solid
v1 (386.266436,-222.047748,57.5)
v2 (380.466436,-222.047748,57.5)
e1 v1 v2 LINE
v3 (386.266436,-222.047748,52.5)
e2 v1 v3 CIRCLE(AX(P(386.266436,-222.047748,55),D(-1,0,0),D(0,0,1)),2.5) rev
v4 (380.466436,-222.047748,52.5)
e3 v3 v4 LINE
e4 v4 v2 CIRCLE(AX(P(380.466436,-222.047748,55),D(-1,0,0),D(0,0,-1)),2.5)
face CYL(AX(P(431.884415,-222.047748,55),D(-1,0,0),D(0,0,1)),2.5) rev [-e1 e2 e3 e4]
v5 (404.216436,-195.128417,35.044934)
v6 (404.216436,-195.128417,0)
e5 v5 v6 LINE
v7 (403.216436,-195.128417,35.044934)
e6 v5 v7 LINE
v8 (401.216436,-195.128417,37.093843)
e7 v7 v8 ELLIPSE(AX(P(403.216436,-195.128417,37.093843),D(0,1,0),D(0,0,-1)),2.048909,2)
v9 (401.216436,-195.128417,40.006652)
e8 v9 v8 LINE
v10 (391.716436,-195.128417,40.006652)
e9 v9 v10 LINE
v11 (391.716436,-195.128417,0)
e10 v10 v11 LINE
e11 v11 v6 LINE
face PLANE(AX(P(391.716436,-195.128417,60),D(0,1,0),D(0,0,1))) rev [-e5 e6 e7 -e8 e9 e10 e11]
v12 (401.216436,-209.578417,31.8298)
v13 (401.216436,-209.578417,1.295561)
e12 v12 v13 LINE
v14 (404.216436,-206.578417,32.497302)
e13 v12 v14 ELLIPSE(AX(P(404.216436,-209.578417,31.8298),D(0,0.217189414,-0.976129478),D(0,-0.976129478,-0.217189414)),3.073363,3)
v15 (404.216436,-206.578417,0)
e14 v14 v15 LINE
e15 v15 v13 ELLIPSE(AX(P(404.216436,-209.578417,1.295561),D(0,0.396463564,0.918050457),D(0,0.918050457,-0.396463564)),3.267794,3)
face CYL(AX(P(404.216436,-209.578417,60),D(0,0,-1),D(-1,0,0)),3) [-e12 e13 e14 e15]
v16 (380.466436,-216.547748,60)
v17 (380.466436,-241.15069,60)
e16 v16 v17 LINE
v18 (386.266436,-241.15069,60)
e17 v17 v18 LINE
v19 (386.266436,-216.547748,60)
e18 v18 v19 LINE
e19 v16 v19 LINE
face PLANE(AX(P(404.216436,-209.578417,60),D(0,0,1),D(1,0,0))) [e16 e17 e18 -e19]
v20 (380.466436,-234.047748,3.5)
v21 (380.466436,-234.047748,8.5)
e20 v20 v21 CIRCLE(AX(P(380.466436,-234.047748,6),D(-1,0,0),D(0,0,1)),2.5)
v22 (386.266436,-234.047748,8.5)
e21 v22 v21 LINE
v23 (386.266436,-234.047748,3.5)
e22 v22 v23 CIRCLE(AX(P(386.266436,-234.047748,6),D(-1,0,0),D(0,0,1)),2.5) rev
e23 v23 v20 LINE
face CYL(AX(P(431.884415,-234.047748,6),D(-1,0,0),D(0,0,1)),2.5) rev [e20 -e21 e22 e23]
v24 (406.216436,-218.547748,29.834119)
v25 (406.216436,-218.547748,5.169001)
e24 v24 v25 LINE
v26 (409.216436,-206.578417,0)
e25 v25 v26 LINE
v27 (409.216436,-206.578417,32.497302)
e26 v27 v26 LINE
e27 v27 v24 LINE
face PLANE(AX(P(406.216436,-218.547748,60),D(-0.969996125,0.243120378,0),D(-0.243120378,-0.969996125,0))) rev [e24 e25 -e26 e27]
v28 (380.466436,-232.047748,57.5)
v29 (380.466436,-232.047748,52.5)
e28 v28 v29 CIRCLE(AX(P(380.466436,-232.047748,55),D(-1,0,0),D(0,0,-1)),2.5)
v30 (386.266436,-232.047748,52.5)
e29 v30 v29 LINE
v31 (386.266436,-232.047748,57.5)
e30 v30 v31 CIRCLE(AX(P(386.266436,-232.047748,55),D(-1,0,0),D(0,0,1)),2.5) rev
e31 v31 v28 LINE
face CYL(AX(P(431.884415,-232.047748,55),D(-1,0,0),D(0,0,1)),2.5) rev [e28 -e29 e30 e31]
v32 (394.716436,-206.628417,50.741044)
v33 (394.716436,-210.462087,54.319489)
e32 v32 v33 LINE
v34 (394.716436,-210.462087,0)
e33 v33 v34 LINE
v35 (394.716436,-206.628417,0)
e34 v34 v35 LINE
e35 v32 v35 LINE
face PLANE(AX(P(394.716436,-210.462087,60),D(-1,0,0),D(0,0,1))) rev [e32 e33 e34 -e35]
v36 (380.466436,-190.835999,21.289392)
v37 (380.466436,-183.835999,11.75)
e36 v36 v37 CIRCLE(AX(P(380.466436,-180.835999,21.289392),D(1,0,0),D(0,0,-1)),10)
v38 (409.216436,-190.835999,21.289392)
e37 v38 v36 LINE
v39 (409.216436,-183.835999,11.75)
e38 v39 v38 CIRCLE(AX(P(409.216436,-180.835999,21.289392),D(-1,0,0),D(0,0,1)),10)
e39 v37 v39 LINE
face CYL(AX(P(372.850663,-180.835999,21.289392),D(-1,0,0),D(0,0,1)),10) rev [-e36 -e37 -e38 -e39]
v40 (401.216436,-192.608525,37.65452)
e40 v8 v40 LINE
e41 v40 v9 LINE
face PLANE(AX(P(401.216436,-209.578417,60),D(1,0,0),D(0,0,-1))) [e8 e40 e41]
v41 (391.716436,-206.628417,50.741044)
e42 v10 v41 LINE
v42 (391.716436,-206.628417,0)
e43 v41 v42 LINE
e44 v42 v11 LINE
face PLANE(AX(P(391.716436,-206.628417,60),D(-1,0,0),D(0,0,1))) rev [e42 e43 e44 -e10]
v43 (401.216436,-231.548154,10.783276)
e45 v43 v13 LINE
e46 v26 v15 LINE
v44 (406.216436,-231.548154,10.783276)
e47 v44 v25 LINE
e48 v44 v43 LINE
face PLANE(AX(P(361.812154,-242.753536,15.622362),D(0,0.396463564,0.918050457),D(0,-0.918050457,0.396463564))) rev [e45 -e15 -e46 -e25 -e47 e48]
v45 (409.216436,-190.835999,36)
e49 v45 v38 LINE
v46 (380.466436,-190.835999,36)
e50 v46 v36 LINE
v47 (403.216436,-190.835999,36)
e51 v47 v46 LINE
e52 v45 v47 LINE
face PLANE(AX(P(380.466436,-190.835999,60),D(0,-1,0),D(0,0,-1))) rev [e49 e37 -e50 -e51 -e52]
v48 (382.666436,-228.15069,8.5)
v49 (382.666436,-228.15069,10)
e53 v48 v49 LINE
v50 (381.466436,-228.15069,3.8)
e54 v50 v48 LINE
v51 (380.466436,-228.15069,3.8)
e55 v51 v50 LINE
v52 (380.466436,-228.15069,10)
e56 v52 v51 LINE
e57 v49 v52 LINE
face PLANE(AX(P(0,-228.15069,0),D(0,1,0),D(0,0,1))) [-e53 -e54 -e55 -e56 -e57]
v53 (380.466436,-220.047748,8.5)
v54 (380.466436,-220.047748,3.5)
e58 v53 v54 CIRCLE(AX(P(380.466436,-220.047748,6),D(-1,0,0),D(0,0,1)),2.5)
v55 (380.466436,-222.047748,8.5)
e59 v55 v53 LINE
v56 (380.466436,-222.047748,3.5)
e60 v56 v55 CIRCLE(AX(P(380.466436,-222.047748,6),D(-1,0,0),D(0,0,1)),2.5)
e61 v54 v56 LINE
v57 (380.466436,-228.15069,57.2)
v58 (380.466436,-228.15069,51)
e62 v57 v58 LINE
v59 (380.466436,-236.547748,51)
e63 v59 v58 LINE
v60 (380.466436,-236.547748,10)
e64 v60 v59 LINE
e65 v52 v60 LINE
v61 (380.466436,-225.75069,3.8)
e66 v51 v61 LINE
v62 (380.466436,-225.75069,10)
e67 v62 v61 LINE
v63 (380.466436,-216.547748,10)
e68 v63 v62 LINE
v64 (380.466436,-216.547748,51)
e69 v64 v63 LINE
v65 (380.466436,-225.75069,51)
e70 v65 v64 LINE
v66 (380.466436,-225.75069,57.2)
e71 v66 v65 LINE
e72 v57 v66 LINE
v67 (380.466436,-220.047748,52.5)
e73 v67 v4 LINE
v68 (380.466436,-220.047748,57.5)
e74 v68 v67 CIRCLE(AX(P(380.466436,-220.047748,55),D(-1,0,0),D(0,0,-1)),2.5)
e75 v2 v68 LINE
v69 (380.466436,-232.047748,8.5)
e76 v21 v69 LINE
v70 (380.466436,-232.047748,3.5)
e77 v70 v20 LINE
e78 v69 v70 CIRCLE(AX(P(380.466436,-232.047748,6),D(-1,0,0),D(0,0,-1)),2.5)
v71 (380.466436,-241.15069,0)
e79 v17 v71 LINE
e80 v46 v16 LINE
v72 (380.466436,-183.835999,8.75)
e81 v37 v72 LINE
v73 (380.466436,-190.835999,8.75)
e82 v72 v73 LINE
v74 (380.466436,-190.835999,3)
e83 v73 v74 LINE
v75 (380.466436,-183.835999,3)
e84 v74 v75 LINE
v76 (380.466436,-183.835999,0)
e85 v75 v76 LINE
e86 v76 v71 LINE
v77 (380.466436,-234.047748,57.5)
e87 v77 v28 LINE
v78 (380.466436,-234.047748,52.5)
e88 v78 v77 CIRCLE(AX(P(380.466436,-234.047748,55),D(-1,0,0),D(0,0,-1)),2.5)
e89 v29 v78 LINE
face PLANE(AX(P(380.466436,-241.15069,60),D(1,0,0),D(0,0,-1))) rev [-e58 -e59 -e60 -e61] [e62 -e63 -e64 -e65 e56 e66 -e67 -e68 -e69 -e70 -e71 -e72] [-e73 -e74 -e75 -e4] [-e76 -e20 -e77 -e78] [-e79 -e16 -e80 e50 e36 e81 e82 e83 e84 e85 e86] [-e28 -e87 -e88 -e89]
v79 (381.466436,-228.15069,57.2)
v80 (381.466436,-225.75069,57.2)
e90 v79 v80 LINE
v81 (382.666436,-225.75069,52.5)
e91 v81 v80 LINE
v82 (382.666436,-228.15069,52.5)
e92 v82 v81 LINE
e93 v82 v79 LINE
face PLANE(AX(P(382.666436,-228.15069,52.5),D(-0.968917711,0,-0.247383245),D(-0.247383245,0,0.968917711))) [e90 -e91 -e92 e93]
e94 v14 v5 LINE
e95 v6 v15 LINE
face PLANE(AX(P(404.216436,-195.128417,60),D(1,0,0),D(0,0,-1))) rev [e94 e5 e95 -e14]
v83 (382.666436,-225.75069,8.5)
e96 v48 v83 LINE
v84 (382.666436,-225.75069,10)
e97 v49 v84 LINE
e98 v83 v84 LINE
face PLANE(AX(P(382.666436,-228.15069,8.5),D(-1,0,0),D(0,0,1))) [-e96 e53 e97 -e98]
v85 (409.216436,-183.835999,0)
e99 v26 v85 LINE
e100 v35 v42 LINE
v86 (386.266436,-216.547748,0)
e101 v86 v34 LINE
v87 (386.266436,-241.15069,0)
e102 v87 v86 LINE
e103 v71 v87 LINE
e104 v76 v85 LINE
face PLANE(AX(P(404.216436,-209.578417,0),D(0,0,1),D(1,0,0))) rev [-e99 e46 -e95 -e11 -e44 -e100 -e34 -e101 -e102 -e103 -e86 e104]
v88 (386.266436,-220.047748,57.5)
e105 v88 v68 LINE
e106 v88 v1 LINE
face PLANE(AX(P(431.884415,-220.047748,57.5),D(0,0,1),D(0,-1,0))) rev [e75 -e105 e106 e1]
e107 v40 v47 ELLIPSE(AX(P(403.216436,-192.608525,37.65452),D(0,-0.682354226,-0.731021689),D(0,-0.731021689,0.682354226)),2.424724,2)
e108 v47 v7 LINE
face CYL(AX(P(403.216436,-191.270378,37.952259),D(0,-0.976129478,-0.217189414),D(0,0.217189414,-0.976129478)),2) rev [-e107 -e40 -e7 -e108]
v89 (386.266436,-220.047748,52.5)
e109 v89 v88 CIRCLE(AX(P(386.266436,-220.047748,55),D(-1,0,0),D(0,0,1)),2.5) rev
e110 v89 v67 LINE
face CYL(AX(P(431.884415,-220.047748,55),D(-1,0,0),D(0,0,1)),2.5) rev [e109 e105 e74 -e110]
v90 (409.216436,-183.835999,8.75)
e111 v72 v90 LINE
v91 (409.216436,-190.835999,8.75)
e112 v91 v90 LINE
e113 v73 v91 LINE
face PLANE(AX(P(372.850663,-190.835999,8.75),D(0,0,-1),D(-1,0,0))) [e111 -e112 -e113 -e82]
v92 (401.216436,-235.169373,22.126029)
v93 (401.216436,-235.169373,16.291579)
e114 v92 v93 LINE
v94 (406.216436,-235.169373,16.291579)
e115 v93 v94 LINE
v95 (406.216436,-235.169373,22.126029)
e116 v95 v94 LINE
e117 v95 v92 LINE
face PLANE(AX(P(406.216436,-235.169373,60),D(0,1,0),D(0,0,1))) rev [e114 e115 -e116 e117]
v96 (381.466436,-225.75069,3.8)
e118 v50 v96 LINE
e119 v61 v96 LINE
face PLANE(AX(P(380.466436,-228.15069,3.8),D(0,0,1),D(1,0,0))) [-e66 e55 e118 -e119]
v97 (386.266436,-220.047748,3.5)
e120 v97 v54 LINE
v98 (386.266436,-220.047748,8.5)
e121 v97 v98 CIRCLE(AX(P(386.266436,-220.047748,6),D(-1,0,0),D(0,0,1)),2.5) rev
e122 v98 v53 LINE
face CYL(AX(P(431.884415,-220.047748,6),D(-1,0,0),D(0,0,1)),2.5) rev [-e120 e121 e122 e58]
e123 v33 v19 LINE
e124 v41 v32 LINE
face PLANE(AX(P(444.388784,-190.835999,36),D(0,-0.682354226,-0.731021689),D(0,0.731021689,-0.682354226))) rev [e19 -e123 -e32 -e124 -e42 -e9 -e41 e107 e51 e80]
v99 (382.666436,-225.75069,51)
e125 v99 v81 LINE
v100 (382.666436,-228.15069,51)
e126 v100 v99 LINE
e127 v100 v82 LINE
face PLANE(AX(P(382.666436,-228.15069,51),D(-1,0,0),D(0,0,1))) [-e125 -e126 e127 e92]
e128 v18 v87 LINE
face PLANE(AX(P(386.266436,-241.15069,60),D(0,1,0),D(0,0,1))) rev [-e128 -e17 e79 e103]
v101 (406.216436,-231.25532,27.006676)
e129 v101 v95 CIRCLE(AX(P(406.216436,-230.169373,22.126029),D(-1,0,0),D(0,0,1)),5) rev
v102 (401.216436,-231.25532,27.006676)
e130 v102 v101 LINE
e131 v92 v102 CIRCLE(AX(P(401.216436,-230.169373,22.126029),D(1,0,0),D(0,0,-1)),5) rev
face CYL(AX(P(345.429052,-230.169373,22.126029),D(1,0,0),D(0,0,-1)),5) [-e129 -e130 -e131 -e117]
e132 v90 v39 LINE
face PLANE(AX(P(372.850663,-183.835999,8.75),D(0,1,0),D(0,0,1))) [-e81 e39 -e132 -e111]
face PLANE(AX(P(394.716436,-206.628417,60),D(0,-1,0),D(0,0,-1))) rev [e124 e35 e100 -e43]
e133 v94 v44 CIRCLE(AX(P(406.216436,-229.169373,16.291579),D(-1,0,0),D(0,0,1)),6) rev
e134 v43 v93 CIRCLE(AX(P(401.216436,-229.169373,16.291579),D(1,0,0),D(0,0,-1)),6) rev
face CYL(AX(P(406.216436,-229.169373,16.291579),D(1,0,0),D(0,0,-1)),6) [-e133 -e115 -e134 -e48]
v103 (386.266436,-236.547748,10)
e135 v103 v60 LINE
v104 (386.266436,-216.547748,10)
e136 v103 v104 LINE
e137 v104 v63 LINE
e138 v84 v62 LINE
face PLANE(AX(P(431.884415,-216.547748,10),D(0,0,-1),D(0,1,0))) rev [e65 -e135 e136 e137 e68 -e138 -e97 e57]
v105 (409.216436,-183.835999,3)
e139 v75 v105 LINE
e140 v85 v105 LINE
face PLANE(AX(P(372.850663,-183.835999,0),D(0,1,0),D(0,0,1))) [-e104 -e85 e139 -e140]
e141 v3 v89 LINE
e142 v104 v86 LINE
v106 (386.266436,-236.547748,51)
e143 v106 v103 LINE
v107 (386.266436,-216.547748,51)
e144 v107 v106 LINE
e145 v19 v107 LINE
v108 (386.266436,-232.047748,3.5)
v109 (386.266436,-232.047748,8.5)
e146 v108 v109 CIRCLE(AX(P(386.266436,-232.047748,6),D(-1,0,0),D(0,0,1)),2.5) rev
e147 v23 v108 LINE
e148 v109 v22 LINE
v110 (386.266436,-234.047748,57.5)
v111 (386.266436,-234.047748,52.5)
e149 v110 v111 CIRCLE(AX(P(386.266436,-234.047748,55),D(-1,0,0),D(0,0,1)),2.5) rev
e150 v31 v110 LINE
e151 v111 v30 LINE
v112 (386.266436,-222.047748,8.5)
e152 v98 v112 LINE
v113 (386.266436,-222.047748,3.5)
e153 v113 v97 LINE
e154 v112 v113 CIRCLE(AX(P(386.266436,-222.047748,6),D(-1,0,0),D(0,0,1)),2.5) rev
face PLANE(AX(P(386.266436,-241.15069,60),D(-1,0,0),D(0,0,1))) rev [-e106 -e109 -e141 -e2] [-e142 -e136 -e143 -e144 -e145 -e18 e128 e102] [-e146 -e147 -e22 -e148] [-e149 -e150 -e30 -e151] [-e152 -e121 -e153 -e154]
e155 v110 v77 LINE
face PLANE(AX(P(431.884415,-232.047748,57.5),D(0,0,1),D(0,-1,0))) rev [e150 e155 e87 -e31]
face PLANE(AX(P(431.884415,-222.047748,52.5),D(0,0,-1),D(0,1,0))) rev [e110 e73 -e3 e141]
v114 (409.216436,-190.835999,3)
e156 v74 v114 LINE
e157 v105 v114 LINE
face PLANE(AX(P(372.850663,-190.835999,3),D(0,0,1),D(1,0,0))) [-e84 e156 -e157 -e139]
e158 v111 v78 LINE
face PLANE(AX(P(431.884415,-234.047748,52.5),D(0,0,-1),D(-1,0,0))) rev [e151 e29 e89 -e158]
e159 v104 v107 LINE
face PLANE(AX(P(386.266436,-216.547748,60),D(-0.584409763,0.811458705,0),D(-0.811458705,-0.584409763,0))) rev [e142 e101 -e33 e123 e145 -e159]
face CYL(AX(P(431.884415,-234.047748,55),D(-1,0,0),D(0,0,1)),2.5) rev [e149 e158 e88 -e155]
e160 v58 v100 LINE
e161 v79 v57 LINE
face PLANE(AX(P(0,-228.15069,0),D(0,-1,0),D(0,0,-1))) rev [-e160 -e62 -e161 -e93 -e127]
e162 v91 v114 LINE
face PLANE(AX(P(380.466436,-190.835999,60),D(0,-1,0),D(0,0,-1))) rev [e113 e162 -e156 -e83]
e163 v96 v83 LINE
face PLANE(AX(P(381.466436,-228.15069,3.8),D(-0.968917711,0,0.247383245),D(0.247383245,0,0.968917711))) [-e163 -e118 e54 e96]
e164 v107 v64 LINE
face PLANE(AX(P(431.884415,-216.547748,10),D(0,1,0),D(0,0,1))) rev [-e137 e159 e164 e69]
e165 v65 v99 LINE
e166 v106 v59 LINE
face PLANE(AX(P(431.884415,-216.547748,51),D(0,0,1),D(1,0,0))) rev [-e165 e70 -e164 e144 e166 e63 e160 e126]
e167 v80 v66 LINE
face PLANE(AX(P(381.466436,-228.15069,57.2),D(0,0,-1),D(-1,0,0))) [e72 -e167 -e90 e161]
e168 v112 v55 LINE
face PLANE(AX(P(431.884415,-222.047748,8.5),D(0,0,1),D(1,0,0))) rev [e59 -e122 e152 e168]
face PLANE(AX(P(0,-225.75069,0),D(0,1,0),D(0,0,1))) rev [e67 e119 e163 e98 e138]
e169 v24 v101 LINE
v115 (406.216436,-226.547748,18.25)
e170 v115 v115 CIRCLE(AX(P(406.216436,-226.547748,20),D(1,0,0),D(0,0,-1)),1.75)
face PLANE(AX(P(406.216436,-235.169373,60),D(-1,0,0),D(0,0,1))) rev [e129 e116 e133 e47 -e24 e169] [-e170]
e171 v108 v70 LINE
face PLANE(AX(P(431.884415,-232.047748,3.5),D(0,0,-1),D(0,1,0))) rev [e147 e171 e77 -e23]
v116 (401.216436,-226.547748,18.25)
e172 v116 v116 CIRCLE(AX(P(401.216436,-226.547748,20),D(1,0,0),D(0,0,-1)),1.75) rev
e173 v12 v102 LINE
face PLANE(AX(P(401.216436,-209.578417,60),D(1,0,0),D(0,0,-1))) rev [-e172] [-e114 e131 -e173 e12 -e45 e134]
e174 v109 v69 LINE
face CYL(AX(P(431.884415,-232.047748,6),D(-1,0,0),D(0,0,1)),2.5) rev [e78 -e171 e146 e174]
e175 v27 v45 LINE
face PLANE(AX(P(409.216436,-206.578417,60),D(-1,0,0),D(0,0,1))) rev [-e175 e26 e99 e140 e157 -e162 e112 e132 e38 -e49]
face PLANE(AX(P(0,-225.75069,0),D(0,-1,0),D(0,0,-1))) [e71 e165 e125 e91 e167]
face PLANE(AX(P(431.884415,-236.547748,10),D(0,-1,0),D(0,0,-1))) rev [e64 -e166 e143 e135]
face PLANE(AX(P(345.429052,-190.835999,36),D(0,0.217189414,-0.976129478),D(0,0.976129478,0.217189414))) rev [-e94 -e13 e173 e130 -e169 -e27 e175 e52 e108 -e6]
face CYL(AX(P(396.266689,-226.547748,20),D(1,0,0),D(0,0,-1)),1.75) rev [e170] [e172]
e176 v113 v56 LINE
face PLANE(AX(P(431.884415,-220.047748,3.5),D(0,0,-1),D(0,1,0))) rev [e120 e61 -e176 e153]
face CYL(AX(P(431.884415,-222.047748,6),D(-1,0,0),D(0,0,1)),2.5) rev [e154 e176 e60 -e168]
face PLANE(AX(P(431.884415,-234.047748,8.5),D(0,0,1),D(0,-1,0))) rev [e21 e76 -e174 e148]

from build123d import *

# Parameters (mm, degrees)
BOSS_EXTRUDE1_DEPTH     = 60
CUT_EXTRUDE1_REACH      = 252.16
SKETCH4_W               = 41
SKETCH4_H               = 20
CUT_EXTRUDE2_DEPTH      = 1
CUT_EXTRUDE2_DEPTH_BACK = 1.4
CUT_EXTRUDE2_START      = -14
SKETCH2_R               = 1.75
CUT_EXTRUDE3_DEPTH      = 5
SKETCH6_W               = 3
SKETCH6_H               = 7
BOSS_EXTRUDE2_DEPTH     = 28.75
FILLET1_R               = 10
CUT_EXTRUDE4_REACH      = 252.16
CUT_EXTRUDE5_REACH      = 252.16
CUT_EXTRUDE6_REACH      = 252.16
FILLET2_R               = 5
FILLET3_R               = 6
FILLET4_R               = 2


with BuildPart() as part:
    # Sketch1 → Boss-Extrude1 (new body)
    with BuildSketch(Plane.XY):
        with BuildLine():
            Line((391.716436469, -195.128416651), (404.216436469, -195.128416651))
            Line((404.216436469, -195.128416651), (404.216436469, -206.578416651))
            ThreePointArc((404.216436469, -206.578416651), (402.095116126, -207.457096307), (401.216436469, -209.578416651))
            Line((401.216436469, -209.578416651), (401.216436469, -235.169373092))
            Line((401.216436469, -235.169373092), (406.216436469, -235.169373092))
            Line((406.216436469, -235.169373092), (406.216436469, -218.547748038))
            Line((406.216436469, -218.547748038), (409.216436469, -206.578416651))
            Line((409.216436469, -206.578416651), (409.216436469, -190.835999092))
            Line((409.216436469, -190.835999092), (380.466436469, -190.835999092))
            Line((380.466436469, -190.835999092), (380.466436469, -241.150690411))
            Line((380.466436469, -241.150690411), (386.266436469, -241.150690411))
            Line((386.266436469, -241.150690411), (386.266436469, -216.54774804))
            Line((386.266436469, -216.54774804), (394.716436469, -210.46208716))
            Line((394.716436469, -210.46208716), (394.716436469, -206.628416651))
            Line((394.716436469, -206.628416651), (391.716436469, -206.628416651))
            Line((391.716436469, -206.628416651), (391.716436469, -195.128416651))
        make_face()
    extrude(amount=BOSS_EXTRUDE1_DEPTH)

    # Cut-Extrude1: up to this face of the body (flat: up to its plane)
    cut_extrude1_end = Plane(part.part.faces().sort_by_distance((386.266436469, -228.849219226, 30))[0])
    # Sketch4 → Cut-Extrude1 (cut, up to the picked face)
    with BuildSketch(Plane.ZY.offset(-380.466436469), mode=Mode.PRIVATE) as cut_extrude1_sk1:
        with BuildLine():
            Line((57.5, -232.04774804), (57.5, -234.04774804))
            ThreePointArc((57.5, -234.04774804), (55, -236.54774804), (52.5, -234.04774804))
            Line((52.5, -234.04774804), (52.5, -232.04774804))
            ThreePointArc((52.5, -232.04774804), (55, -229.54774804), (57.5, -232.04774804))
        make_face()
    cut_extrude1_tool1 = split(extrude(cut_extrude1_sk1.sketch, amount=-CUT_EXTRUDE1_REACH, mode=Mode.PRIVATE), bisect_by=cut_extrude1_end, keep=Keep.BOTH, mode=Mode.PRIVATE)
    # Sketch4 → Cut-Extrude1 (cut, up to the picked face)
    with BuildSketch(Plane.ZY.offset(-380.466436469), mode=Mode.PRIVATE) as cut_extrude1_sk2:
        with Locations((30.5, -226.54774804)):
            Rectangle(SKETCH4_W, SKETCH4_H)
    cut_extrude1_tool2 = split(extrude(cut_extrude1_sk2.sketch, amount=-CUT_EXTRUDE1_REACH, mode=Mode.PRIVATE), bisect_by=cut_extrude1_end, keep=Keep.BOTH, mode=Mode.PRIVATE)
    # Sketch4 → Cut-Extrude1 (cut, up to the picked face)
    with BuildSketch(Plane.ZY.offset(-380.466436469), mode=Mode.PRIVATE) as cut_extrude1_sk3:
        with BuildLine():
            Line((8.5, -222.04774804), (8.5, -220.04774804))
            ThreePointArc((8.5, -220.04774804), (6, -217.54774804), (3.5, -220.04774804))
            Line((3.5, -220.04774804), (3.5, -222.04774804))
            ThreePointArc((3.5, -222.04774804), (6, -224.54774804), (8.5, -222.04774804))
        make_face()
    cut_extrude1_tool3 = split(extrude(cut_extrude1_sk3.sketch, amount=-CUT_EXTRUDE1_REACH, mode=Mode.PRIVATE), bisect_by=cut_extrude1_end, keep=Keep.BOTH, mode=Mode.PRIVATE)
    # Sketch4 → Cut-Extrude1 (cut, up to the picked face)
    with BuildSketch(Plane.ZY.offset(-380.466436469), mode=Mode.PRIVATE) as cut_extrude1_sk4:
        with BuildLine():
            Line((3.5, -232.04774804), (3.5, -234.04774804))
            ThreePointArc((3.5, -234.04774804), (6, -236.54774804), (8.5, -234.04774804))
            Line((8.5, -234.04774804), (8.5, -232.04774804))
            ThreePointArc((8.5, -232.04774804), (6, -229.54774804), (3.5, -232.04774804))
        make_face()
    cut_extrude1_tool4 = split(extrude(cut_extrude1_sk4.sketch, amount=-CUT_EXTRUDE1_REACH, mode=Mode.PRIVATE), bisect_by=cut_extrude1_end, keep=Keep.BOTH, mode=Mode.PRIVATE)
    # Sketch4 → Cut-Extrude1 (cut, up to the picked face)
    with BuildSketch(Plane.ZY.offset(-380.466436469), mode=Mode.PRIVATE) as cut_extrude1_sk5:
        with BuildLine():
            Line((57.5, -220.04774804), (57.5, -222.04774804))
            ThreePointArc((57.5, -222.04774804), (55, -224.54774804), (52.5, -222.04774804))
            Line((52.5, -222.04774804), (52.5, -220.04774804))
            ThreePointArc((52.5, -220.04774804), (55, -217.54774804), (57.5, -220.04774804))
        make_face()
    cut_extrude1_tool5 = split(extrude(cut_extrude1_sk5.sketch, amount=-CUT_EXTRUDE1_REACH, mode=Mode.PRIVATE), bisect_by=cut_extrude1_end, keep=Keep.BOTH, mode=Mode.PRIVATE)
    add(cut_extrude1_tool1.solids().sort_by(Axis((380.466436, -233.047748, 55), (1, 0, 0)))[0], mode=Mode.SUBTRACT)
    add(cut_extrude1_tool2.solids().sort_by(Axis((380.466436, -226.547748, 30.5), (1, 0, 0)))[0], mode=Mode.SUBTRACT)
    add(cut_extrude1_tool3.solids().sort_by(Axis((380.466436, -221.047748, 6), (1, 0, 0)))[0], mode=Mode.SUBTRACT)
    add(cut_extrude1_tool4.solids().sort_by(Axis((380.466436, -233.047748, 6), (1, 0, 0)))[0], mode=Mode.SUBTRACT)
    add(cut_extrude1_tool5.solids().sort_by(Axis((380.466436, -221.047748, 55), (1, 0, 0)))[0], mode=Mode.SUBTRACT)

    # Sketch5 → Cut-Extrude2 (cut, two sides: drawn at the far end of the back side and taken through both)
    with BuildSketch(Plane.XZ.offset(241.150690411).offset(CUT_EXTRUDE2_START - CUT_EXTRUDE2_DEPTH_BACK)):
        Polygon((380.466436469, 51), (382.666436469, 51), (382.666436469, 52.5), (381.466436469, 57.2), (380.466436469, 57.2), align=None)
        Polygon((380.466436469, 10), (382.666436469, 10), (382.666436469, 8.5), (381.466436469, 3.8), (380.466436469, 3.8), align=None)
    extrude(amount=CUT_EXTRUDE2_DEPTH + CUT_EXTRUDE2_DEPTH_BACK, mode=Mode.SUBTRACT)

    # Sketch2 → Cut-Extrude3 (cut)
    with BuildSketch(Plane(origin=(406.216436469, 0, 0), x_dir=(0, 0, -1), z_dir=(1, 0, 0))):
        with Locations((-20, -226.54774804)):
            Circle(SKETCH2_R)
    extrude(amount=-CUT_EXTRUDE3_DEPTH, mode=Mode.SUBTRACT)

    # Sketch6 → Boss-Extrude2 (add)
    with BuildSketch(Plane(origin=(409.216436469, 0, 0), x_dir=(0, 0, -1), z_dir=(1, 0, 0))):
        with Locations((-1.5, -187.335999092)):
            Rectangle(SKETCH6_W, SKETCH6_H)
        with Locations((-10.25, -187.335999092)):
            Rectangle(SKETCH6_W, SKETCH6_H)
    extrude(amount=-BOSS_EXTRUDE2_DEPTH)

    # Fillet1
    # the kernel refuses this fillet: 10 mm, written as the material it adds along each edge
    with BuildSketch(Plane(origin=(409.216436469, -190.835999092, 11.75), x_dir=(0, 1, 0), z_dir=(-1, 0, 0))) as fillet1_piece_1:
        with BuildLine():
            CenterArc((10, -9.539392014), FILLET1_R, 107.457603124, 72.542396876)
            Line((0, -9.539392014), (-0.2, -9.539392014))
            Line((-0.2, -9.539392014), (-0.2, 0))
            Line((-0.2, 0), (0, 0.2))
            ThreePointArc((0, 0.2), (3.5, 0.2), (6.94, 0.19078784))
            Line((6.94, 0.19078784), (7, 0))
        make_face()
    extrude(amount=28.75)

    # Cut-Extrude4: up to this face of the body (flat: up to its plane)
    cut_extrude4_end = Plane(part.part.faces().sort_by_distance((409.216436469, -198.059355839, 28.706804471))[0])
    # Sketch7 → Cut-Extrude4 (cut, up to the picked face)
    with BuildSketch(Plane.ZY.offset(-380.466436469), mode=Mode.PRIVATE) as cut_extrude4_sk1:
        Polygon((60, -190.835999092), (36, -190.835999092), (60, -216.54774804), align=None)
    cut_extrude4_tool1 = split(extrude(cut_extrude4_sk1.sketch, amount=-CUT_EXTRUDE4_REACH, mode=Mode.PRIVATE), bisect_by=cut_extrude4_end, keep=Keep.BOTH, mode=Mode.PRIVATE)
    add(cut_extrude4_tool1.solids().sort_by(Axis((380.466436, -199.406582, 52), (1, 0, 0)))[0], mode=Mode.SUBTRACT)

    # Cut-Extrude5: up to this face of the body (flat: up to its plane)
    cut_extrude5_end = Plane(part.part.faces().sort_by_distance((401.216436469, -222.505111575, 29.644283509))[0])
    # Sketch8 → Cut-Extrude5 (cut, up to the picked face)
    with BuildSketch(Plane(origin=(409.216436469, 0, 0), x_dir=(0, 0, -1), z_dir=(1, 0, 0)), mode=Mode.PRIVATE) as cut_extrude5_sk1:
        Polygon((-36, -235.169373092), (-60, -235.169373092), (-60, -190.835999092), (-36, -190.835999092), (-26.135796826, -235.169373092), align=None)
    cut_extrude5_tool1 = split(extrude(cut_extrude5_sk1.sketch, amount=-CUT_EXTRUDE5_REACH, mode=Mode.PRIVATE), bisect_by=cut_extrude5_end, keep=Keep.BOTH, mode=Mode.PRIVATE)
    add(cut_extrude5_tool1.solids().sort_by(Axis((409.216436, -214.262283, 45.393819), (-1, 0, 0)))[0], mode=Mode.SUBTRACT)

    # Cut-Extrude6: up to this face of the body (flat: up to its plane)
    cut_extrude6_end = Plane(part.part.faces().sort_by_distance((401.216436469, -221.894565092, 14.466227032))[0])
    # Sketch10 → Cut-Extrude6 (cut, up to the picked face)
    with BuildSketch(Plane(origin=(409.216436469, 0, 0), x_dir=(0, 0, -1), z_dir=(1, 0, 0)), mode=Mode.PRIVATE) as cut_extrude6_sk1:
        Polygon((0, -206.578416651), (0, -242.75353584), (-15.622362106, -242.75353584), align=None)
    cut_extrude6_tool1 = split(extrude(cut_extrude6_sk1.sketch, amount=-CUT_EXTRUDE6_REACH, mode=Mode.PRIVATE), bisect_by=cut_extrude6_end, keep=Keep.BOTH, mode=Mode.PRIVATE)
    add(cut_extrude6_tool1.solids().sort_by(Axis((409.216436, -230.695163, 5.207454), (-1, 0, 0)))[0], mode=Mode.SUBTRACT)

    # Fillet2
    fillet2_edges = [part.edges().sort_by_distance(p)[0] for p in [
        (403.716436469, -235.169373092, 26.135796826),
    ]]
    fillet(fillet2_edges, radius=FILLET2_R)

    # Fillet3
    fillet3_edges = [part.edges().sort_by_distance(p)[0] for p in [
        (403.716436469, -235.169373092, 12.347112725),
    ]]
    fillet(fillet3_edges, radius=FILLET3_R)

    # Fillet4
    fillet4_edges = [part.edges().sort_by_distance(p)[0] for p in [
        (401.216436469, -192.982207872, 35.522467217),
    ]]
    fillet(fillet4_edges, radius=FILLET4_R)


solid = part.part
